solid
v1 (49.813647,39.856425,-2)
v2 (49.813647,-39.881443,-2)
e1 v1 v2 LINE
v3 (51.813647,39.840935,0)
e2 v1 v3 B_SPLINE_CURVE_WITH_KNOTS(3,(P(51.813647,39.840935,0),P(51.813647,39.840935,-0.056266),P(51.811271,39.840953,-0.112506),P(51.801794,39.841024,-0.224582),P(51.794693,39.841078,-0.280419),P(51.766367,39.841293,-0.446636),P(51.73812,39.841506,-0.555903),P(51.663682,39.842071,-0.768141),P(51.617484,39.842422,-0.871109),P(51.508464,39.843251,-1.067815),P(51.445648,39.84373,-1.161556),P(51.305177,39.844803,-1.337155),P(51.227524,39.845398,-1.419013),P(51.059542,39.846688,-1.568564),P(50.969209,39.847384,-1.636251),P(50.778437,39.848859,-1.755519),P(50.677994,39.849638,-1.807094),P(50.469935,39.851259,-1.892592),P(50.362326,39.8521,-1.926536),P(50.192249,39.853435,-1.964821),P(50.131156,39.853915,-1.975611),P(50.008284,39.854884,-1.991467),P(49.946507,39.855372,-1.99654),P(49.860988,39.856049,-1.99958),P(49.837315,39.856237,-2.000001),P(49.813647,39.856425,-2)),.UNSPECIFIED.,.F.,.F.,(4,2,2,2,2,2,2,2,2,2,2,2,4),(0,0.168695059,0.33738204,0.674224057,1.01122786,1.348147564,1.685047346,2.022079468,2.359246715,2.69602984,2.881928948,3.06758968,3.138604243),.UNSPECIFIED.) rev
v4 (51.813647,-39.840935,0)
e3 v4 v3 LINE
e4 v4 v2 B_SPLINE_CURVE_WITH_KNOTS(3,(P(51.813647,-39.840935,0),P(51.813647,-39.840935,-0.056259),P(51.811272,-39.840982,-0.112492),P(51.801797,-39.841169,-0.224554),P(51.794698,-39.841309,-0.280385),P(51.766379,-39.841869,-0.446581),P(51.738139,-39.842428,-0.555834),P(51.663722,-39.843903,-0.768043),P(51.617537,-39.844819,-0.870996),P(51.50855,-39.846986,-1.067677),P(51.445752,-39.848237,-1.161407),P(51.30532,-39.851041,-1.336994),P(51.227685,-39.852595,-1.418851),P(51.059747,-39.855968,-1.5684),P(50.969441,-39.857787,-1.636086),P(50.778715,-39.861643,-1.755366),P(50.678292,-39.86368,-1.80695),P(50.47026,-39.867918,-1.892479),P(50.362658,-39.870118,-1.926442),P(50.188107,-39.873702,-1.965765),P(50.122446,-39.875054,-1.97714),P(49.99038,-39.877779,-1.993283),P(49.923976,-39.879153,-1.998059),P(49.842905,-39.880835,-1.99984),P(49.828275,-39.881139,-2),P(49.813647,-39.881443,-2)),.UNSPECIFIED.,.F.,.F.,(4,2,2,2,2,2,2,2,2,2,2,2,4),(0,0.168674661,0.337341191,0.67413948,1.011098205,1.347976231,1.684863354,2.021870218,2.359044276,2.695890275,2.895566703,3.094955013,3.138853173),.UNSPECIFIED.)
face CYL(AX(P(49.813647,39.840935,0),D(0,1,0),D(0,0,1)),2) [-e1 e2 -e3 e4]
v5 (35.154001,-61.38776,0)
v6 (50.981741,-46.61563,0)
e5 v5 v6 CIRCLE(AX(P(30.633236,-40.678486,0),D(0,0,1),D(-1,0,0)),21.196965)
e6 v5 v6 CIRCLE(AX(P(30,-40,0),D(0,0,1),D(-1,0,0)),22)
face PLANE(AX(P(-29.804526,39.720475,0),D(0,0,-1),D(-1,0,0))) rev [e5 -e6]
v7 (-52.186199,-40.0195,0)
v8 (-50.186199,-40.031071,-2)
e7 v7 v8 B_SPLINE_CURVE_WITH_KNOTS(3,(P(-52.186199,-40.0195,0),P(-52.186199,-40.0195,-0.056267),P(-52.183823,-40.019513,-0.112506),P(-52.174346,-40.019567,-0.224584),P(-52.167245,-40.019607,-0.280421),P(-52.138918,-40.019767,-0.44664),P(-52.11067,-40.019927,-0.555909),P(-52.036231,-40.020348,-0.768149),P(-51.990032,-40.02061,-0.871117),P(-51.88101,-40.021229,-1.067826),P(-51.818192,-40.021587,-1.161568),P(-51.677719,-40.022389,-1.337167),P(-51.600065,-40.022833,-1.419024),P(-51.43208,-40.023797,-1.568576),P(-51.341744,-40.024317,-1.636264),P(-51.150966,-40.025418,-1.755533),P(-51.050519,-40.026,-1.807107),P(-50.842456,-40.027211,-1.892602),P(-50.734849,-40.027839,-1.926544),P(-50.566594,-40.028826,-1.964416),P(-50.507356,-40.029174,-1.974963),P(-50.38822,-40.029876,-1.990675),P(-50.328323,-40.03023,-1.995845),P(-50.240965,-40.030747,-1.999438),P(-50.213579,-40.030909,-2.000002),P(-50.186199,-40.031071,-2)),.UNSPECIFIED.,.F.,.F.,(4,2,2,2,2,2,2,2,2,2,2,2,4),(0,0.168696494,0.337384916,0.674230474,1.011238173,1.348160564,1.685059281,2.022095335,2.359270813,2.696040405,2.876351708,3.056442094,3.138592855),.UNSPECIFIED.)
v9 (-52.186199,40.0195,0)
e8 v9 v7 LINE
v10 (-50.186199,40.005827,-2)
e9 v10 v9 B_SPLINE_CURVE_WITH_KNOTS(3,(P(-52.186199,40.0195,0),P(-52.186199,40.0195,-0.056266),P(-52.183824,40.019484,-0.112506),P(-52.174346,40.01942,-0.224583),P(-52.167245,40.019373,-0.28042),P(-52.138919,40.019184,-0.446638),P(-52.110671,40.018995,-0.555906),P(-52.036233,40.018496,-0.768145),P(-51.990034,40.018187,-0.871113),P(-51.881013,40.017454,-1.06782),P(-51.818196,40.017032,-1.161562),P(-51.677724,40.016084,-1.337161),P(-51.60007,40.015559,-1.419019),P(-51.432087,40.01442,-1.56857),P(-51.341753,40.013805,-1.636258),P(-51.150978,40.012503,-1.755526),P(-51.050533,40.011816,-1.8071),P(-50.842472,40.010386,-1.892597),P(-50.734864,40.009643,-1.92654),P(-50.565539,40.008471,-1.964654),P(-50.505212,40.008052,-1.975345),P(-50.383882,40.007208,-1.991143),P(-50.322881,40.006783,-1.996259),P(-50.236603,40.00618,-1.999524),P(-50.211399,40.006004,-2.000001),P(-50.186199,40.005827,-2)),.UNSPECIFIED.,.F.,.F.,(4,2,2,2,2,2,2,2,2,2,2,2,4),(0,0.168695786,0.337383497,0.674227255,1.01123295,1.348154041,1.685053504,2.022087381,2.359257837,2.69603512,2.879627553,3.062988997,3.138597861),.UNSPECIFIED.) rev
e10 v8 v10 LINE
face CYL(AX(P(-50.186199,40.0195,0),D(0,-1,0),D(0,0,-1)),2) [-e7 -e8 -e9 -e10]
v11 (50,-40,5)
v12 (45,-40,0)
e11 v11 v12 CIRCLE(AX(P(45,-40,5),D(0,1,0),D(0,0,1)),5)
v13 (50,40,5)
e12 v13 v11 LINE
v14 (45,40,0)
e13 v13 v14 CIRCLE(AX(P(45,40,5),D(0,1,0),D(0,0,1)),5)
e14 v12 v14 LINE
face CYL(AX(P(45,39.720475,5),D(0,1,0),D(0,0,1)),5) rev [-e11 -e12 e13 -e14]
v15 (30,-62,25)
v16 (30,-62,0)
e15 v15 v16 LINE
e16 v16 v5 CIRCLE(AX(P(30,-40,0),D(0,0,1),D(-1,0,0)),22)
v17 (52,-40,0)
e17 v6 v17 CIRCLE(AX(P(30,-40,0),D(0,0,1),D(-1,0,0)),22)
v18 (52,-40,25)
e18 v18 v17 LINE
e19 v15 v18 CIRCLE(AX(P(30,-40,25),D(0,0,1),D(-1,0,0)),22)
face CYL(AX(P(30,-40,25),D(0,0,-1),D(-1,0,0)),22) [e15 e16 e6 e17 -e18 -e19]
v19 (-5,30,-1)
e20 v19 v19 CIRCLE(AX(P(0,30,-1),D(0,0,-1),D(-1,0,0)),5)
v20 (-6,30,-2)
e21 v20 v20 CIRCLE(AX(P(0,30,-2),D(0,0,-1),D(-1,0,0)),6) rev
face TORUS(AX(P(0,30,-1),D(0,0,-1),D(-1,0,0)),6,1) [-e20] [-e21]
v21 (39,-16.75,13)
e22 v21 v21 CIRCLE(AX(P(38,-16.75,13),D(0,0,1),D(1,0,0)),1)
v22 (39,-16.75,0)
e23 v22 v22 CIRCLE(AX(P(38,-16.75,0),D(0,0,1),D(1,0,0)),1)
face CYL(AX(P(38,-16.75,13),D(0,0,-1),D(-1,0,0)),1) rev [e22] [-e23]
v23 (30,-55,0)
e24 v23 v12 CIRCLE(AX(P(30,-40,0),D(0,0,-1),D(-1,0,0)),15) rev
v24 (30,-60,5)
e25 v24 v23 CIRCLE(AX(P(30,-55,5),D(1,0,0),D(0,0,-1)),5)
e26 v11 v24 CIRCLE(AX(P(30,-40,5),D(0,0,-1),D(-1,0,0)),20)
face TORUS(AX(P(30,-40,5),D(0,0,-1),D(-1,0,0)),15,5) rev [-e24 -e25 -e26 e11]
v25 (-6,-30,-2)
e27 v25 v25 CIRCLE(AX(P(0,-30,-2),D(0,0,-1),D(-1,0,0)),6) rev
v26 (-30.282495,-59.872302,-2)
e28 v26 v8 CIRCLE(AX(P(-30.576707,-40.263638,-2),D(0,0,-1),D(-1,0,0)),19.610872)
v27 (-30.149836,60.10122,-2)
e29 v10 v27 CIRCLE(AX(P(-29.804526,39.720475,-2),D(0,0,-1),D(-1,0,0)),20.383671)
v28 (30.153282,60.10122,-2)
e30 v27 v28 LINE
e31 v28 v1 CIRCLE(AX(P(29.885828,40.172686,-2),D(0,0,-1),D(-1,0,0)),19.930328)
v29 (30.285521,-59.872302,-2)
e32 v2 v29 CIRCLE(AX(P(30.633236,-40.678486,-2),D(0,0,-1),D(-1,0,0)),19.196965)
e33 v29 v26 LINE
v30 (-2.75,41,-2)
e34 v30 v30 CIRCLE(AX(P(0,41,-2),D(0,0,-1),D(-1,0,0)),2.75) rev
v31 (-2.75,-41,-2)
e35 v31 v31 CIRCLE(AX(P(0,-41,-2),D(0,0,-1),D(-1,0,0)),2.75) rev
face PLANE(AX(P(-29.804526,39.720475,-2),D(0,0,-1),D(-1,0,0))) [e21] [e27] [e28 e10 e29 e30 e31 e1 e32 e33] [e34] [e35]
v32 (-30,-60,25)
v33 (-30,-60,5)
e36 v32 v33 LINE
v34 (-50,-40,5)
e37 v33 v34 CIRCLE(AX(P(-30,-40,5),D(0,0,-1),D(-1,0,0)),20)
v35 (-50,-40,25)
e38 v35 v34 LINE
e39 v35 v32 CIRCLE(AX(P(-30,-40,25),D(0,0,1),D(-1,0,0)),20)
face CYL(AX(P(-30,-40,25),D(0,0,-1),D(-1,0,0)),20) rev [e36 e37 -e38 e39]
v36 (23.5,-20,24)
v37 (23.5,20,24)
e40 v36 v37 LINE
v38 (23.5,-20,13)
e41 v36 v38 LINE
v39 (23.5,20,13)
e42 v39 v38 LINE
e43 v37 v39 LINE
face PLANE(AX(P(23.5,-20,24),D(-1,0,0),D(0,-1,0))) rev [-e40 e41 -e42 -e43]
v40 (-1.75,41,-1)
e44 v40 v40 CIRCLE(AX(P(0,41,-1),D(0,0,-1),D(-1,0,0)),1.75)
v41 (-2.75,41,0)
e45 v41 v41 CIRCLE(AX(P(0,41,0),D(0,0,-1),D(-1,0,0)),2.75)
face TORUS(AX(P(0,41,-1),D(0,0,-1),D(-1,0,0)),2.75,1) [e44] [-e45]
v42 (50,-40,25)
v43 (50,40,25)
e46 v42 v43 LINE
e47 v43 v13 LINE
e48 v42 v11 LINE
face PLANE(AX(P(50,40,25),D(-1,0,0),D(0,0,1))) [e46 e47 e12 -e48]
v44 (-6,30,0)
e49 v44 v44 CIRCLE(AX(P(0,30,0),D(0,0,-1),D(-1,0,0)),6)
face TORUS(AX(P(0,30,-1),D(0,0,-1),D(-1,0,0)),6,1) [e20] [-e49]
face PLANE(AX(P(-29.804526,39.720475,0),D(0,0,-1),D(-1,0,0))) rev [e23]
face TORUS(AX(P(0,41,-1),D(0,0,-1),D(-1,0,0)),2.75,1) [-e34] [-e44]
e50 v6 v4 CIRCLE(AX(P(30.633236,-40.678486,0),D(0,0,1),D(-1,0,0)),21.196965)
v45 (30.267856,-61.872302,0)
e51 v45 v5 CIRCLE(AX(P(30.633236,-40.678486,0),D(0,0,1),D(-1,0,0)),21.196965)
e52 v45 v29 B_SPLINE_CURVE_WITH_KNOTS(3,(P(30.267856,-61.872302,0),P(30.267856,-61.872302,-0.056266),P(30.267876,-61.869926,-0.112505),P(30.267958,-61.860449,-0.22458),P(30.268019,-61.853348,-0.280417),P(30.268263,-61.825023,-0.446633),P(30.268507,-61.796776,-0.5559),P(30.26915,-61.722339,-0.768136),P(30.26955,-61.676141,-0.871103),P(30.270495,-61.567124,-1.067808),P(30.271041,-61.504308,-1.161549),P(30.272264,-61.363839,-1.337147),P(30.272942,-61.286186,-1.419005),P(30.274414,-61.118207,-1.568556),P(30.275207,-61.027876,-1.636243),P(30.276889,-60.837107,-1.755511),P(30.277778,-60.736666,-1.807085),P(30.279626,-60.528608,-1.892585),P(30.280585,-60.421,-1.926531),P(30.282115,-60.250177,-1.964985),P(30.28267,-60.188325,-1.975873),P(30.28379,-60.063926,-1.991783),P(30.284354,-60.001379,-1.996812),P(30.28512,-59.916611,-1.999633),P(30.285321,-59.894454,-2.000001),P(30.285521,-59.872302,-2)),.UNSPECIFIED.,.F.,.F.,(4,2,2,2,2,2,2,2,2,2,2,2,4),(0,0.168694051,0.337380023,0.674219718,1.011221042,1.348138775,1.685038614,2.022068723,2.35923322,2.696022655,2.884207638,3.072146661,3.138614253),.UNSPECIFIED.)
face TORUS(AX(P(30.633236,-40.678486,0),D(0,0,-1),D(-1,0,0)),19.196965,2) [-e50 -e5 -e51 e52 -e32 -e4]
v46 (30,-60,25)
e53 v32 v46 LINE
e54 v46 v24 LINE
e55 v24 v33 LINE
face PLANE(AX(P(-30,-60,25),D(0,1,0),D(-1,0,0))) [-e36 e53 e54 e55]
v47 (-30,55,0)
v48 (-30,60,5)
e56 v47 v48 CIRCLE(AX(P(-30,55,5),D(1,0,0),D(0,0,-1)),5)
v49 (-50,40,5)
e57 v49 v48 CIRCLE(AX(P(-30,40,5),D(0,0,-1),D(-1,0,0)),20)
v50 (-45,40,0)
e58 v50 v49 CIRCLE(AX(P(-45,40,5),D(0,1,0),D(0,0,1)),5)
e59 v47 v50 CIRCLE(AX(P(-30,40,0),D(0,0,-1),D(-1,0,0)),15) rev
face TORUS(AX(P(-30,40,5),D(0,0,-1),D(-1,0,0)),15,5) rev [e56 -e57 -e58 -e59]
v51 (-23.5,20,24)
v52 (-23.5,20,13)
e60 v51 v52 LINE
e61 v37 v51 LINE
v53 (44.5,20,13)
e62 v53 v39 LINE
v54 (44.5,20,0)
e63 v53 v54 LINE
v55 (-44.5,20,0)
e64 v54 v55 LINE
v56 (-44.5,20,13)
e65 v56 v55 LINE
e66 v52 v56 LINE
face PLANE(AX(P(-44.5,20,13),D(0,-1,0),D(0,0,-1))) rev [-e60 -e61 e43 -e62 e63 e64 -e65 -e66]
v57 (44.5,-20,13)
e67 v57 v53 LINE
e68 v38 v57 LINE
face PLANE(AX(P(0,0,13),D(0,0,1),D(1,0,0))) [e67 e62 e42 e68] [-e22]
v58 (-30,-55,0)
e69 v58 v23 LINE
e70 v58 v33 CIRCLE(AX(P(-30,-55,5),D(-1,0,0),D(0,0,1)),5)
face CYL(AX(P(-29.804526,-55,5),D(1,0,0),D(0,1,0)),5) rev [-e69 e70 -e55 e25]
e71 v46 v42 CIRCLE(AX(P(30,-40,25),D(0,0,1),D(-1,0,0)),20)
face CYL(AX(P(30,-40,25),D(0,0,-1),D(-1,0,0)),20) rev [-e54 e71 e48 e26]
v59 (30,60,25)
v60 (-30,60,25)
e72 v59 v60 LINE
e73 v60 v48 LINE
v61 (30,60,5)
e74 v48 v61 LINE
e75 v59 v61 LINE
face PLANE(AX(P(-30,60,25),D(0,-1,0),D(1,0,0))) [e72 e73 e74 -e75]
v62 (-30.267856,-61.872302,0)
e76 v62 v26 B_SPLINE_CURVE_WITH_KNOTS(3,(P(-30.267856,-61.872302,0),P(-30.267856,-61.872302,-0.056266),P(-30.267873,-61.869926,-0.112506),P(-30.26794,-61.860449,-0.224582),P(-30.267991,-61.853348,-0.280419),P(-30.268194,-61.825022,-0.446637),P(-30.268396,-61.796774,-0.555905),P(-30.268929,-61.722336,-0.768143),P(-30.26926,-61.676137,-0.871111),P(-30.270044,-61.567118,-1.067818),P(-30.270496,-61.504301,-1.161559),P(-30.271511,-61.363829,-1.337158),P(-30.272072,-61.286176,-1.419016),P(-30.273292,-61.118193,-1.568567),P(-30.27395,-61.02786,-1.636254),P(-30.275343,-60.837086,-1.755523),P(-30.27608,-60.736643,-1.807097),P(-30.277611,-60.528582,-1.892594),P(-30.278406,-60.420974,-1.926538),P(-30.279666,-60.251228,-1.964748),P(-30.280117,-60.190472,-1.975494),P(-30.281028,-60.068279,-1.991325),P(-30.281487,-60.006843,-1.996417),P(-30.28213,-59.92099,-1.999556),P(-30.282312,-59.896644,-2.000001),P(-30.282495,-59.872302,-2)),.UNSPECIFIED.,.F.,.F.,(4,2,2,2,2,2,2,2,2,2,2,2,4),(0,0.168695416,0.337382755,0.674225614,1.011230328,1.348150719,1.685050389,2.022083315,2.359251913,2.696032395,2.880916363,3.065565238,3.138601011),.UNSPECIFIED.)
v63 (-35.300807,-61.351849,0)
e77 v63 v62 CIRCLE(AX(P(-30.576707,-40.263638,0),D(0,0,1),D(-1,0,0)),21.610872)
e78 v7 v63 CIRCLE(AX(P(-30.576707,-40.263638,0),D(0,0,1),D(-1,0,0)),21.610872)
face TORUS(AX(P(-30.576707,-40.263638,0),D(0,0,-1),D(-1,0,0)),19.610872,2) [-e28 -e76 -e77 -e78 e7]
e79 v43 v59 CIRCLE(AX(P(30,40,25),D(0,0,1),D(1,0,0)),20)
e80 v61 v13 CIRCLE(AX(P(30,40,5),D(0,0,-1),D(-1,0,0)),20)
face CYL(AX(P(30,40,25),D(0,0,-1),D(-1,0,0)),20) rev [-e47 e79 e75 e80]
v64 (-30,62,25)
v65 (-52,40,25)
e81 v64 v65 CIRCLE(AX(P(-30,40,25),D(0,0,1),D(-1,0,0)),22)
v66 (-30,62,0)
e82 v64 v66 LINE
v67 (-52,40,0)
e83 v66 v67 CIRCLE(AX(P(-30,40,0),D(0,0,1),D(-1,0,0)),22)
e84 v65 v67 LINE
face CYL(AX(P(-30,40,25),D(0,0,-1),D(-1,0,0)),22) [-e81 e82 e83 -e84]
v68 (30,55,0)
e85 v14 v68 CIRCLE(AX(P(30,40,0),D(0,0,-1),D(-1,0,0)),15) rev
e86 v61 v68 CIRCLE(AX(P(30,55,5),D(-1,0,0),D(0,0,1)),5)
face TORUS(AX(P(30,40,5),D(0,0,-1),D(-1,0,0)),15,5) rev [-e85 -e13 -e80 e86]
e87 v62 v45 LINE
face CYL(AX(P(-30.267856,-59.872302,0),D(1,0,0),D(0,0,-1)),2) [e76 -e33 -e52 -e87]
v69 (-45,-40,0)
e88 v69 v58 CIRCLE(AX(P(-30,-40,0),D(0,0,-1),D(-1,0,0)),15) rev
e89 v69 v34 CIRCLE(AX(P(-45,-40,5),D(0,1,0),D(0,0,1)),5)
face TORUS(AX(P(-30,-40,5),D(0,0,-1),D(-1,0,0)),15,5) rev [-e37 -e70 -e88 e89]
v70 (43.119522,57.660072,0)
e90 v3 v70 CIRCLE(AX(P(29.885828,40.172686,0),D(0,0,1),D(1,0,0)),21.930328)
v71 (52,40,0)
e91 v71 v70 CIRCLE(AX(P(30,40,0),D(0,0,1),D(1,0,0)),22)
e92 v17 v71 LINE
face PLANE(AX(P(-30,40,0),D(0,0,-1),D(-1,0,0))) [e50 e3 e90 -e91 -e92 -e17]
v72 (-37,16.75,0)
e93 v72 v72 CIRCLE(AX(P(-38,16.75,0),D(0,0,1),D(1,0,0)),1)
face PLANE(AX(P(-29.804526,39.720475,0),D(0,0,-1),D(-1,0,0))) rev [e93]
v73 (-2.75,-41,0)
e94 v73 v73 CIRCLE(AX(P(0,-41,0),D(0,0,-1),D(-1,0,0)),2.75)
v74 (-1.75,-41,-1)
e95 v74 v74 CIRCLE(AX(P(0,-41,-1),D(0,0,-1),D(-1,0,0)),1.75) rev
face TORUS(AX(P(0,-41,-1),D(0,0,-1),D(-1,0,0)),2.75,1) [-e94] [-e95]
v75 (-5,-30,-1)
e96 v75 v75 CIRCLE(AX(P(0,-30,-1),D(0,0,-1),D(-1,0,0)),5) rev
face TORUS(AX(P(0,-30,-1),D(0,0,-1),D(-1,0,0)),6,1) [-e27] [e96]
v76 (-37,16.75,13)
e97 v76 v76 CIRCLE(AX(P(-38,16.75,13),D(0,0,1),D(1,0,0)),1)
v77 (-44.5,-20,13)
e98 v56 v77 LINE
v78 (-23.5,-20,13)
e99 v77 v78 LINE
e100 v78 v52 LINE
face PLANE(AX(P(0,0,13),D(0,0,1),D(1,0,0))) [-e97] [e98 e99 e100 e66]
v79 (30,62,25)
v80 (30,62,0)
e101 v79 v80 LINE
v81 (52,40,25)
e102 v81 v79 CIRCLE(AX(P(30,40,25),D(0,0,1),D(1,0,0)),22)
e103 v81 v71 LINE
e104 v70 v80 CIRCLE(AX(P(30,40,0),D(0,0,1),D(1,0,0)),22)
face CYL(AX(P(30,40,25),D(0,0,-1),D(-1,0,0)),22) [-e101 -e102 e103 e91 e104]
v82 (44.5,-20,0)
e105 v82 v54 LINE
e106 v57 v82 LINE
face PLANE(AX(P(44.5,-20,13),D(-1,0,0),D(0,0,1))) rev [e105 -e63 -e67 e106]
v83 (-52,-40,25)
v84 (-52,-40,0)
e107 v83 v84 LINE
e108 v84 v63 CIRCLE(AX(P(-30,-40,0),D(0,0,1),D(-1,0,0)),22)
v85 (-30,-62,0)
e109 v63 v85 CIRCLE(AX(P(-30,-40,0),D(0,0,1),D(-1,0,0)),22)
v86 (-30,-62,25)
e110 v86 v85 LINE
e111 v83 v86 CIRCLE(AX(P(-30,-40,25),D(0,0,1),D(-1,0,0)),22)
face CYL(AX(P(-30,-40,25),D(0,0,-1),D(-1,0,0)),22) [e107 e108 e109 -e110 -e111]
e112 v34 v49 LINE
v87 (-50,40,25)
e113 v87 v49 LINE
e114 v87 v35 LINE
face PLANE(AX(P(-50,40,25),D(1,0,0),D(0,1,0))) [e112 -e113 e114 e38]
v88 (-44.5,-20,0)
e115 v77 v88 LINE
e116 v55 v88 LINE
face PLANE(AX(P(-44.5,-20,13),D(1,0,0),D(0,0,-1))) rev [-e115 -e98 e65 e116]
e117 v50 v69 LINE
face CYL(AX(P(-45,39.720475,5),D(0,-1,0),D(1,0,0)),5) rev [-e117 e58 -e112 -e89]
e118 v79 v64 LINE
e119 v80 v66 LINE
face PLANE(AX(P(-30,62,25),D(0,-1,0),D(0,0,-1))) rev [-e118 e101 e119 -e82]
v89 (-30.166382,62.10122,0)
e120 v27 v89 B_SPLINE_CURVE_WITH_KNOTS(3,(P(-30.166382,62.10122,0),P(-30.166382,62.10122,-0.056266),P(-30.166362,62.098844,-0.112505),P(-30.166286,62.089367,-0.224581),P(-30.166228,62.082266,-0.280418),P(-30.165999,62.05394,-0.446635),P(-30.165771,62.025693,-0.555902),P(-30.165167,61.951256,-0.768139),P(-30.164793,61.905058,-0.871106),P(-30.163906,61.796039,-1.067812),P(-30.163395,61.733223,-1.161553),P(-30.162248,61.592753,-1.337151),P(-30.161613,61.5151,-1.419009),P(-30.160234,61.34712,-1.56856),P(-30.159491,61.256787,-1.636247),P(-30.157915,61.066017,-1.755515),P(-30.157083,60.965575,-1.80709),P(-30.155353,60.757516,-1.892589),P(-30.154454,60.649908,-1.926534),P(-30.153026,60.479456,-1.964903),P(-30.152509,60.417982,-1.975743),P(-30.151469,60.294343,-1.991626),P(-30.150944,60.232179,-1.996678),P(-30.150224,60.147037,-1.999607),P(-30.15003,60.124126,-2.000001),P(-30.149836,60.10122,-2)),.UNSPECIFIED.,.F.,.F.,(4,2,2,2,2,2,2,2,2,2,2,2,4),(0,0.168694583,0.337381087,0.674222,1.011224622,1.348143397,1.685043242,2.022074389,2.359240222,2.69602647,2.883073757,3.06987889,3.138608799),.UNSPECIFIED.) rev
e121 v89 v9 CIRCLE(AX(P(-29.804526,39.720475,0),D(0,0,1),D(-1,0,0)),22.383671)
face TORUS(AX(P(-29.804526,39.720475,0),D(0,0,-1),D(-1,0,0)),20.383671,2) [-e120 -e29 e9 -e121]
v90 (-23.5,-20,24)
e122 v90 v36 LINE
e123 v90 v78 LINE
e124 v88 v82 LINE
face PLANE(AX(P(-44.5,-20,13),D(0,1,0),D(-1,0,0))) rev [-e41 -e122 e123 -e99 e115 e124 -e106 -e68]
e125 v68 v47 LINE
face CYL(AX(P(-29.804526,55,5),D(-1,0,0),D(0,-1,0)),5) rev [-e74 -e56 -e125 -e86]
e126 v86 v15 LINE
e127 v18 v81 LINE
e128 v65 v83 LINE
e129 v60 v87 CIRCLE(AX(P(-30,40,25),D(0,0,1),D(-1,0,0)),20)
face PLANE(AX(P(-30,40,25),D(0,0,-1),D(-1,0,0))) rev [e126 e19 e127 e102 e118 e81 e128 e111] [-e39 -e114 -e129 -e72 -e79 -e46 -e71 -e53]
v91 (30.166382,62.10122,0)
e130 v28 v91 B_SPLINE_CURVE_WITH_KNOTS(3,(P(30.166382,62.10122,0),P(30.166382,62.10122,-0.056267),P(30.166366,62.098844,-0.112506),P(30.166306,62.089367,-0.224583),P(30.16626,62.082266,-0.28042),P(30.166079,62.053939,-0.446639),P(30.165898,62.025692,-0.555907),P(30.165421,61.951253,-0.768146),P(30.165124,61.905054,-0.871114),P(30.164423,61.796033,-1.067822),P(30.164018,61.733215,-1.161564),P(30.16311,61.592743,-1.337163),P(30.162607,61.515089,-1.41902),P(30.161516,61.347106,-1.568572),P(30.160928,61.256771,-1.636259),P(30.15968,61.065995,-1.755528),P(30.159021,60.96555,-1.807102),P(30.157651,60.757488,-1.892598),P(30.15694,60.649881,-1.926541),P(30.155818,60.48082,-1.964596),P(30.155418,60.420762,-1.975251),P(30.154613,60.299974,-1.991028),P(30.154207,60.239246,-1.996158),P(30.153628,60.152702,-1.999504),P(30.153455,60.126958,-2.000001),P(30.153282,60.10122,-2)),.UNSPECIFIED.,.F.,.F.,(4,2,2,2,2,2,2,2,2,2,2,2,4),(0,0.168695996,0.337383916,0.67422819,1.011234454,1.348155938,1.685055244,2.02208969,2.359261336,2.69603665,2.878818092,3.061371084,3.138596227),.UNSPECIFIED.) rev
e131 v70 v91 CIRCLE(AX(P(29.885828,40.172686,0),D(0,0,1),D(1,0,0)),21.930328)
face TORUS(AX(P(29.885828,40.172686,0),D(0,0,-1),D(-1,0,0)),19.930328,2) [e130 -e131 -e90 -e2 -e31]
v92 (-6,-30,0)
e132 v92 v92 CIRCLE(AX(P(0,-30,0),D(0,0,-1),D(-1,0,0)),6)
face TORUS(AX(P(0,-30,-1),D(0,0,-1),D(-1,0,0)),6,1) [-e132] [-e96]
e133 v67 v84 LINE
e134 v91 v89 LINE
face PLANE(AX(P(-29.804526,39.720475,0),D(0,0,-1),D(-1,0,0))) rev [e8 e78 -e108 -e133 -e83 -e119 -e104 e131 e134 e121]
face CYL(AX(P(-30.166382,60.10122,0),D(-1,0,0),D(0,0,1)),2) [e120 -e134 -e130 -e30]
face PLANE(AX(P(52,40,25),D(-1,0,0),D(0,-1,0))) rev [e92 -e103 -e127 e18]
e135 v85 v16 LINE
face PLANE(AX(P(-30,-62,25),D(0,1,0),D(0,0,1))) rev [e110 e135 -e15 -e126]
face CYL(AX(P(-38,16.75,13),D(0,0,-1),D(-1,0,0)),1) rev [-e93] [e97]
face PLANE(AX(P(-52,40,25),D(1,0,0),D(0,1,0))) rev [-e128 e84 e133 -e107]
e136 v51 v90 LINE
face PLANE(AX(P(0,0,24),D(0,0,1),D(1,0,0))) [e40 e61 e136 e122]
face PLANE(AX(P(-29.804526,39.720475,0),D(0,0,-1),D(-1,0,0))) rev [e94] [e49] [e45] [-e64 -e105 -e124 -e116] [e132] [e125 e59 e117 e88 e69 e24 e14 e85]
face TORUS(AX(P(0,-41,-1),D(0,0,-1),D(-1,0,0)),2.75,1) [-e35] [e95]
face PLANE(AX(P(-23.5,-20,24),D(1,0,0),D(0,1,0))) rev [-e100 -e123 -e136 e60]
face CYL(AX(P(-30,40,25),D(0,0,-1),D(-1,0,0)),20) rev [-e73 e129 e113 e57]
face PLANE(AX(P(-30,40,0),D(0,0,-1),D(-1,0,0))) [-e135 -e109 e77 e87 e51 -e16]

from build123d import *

# Parameters (mm, degrees)
BOSS_EXTRUDE7_DEPTH  = 25
CASE_BOTTOM_R        = 1.75
CASE_BOTTOM_R_2      = 5
BOSS_EXTRUDE9_DEPTH  = 2
FILLET1_R            = 5
FILLET2_R            = 2
FILLET3_R            = 1
SONOFF_W             = 89
SONOFF_H             = 40
SONOFF_R             = 1
BOSS_EXTRUDE10_DEPTH = 13
SKETCH2_W            = 47
SKETCH2_H            = 40
BOSS_EXTRUDE11_DEPTH = 24


# Some blends are built 0.0001 mm under size
with BuildPart() as part:
    # Case Sides → Boss-Extrude7 (new body)
    with BuildSketch(Plane.XY):
        with BuildLine():
            Line((-30, 62), (30, 62))
            ThreePointArc((30, 62), (45.556349186, 55.556349186), (52, 40))
            Line((52, 40), (52, -40))
            ThreePointArc((52, -40), (45.556349186, -55.556349186), (30, -62))
            Line((30, -62), (-30, -62))
            ThreePointArc((-30, -62), (-45.556349186, -55.556349186), (-52, -40))
            Line((-52, -40), (-52, 40))
            ThreePointArc((-52, 40), (-45.556349186, 55.556349186), (-30, 62))
        make_face()
        with BuildLine():
            Line((-30, 60), (30, 60))
            ThreePointArc((30, 60), (44.142135624, 54.142135624), (50, 40))
            Line((50, 40), (50, -40))
            ThreePointArc((50, -40), (44.142135624, -54.142135624), (30, -60))
            Line((30, -60), (-30, -60))
            ThreePointArc((-30, -60), (-44.142135624, -54.142135624), (-50, -40))
            Line((-50, -40), (-50, 40))
            ThreePointArc((-50, 40), (-44.142135624, 54.142135624), (-30, 60))
        make_face(mode=Mode.SUBTRACT)
    extrude(amount=BOSS_EXTRUDE7_DEPTH)

    # Case Bottom → Boss-Extrude9 (add)
    with BuildSketch(Plane.XY):
        with BuildLine():
            Line((-30.166381545, 62.101220113), (30.166381545, 62.101220113))
            ThreePointArc((30.166381545, 62.101220113), (45.607883681, 55.461776572), (51.813647258, 39.840934815))
            Line((51.813647258, 39.840934815), (51.813647258, -39.840934815))
            ThreePointArc((51.813647258, -39.840934815), (45.787828122, -55.499068587), (30.267855704, -61.872302115))
            Line((30.267855704, -61.872302115), (-30.267855704, -61.872302115))
            ThreePointArc((-30.267855704, -61.872302115), (-45.835002173, -55.567695757), (-52.186199447, -40.019499601))
            Line((-52.186199447, -40.019499601), (-52.186199447, 40.019499601))
            ThreePointArc((-52.186199447, 40.019499601), (-45.654372223, 55.52588799), (-30.166381545, 62.101220113))
        make_face()
        with Locations((0, 41)):
            Circle(CASE_BOTTOM_R, mode=Mode.SUBTRACT)
        with Locations((0, -41)):
            Circle(CASE_BOTTOM_R, mode=Mode.SUBTRACT)
        with Locations((0, 30)):
            Circle(CASE_BOTTOM_R_2, mode=Mode.SUBTRACT)
        with Locations((0, -30)):
            Circle(CASE_BOTTOM_R_2, mode=Mode.SUBTRACT)
    extrude(amount=-BOSS_EXTRUDE9_DEPTH)

    # Fillet1
    fillet1_edges = [part.edges().sort_by_distance(p)[0] for p in [
        (44.142135624, 54.142135624, 0),
        (0, 60, 0),
        (-44.142135624, 54.142135624, 0),
        (-50, 0, 0),
        (-44.142135624, -54.142135624, 0),
        (0, -60, 0),
        (44.142135624, -54.142135624, 0),
        (50, 0, 0),
    ]]
    fillet(fillet1_edges, radius=FILLET1_R)

    # Fillet2
    # the kernel refuses this fillet: 2 mm, written as the material it adds along each edge
    with BuildSketch(Plane(origin=(51.813647258, 39.840934815, 0.036995851), x_dir=(0.014804575706989804, 0.9998904062636744, 0), z_dir=(0, 0, -1))) as fillet2_piece_1:
        with BuildLine():
            CenterArc((0.014812433, 1.999999896), FILLET2_R, 269.151729306, 0.829764856)
            Line((-0.014796719, 0.000219083), (0, 0))
            ThreePointArc((0, 0), (0.007083229, 1.144e-06), (0.014166457, 0))
        make_face()
    extrude(amount=2.036995851)
    with BuildSketch(Plane(origin=(51.813647258, -39.840934815, 0.096592655), x_dir=(0, 1, 0), z_dir=(0, 0, -1))) as fillet2_piece_2:
        with BuildLine():
            CenterArc((0.038637062, 2), FILLET2_R, 267.835326297, 2.164673703)
            ThreePointArc((-0.03690633, 0.00142721), (-0.018452854, 0.000721643), (0, 0))
            Line((0, 0), (0.038637062, 0))
        make_face()
    extrude(amount=2.096592655)
    with BuildSketch(Plane(origin=(30.267855704, -61.872302115, 0.042125301), x_dir=(0.9998579024887219, -0.016857485899548712, 0), z_dir=(0, 0, -1))) as fillet2_piece_3:
        with BuildLine():
            CenterArc((0.016867246, 1.999999856), FILLET2_R, 269.034091453, 0.944139309)
            Line((-0.016847726, 0.000284051), (0, 0))
            ThreePointArc((0, 0), (0.008053678, 1.53e-06), (0.016107356, 0))
        make_face()
    extrude(amount=2.042125301)
    with BuildSketch(Plane(origin=(-30.267855704, -61.872302115, 0.034939961), x_dir=(-0.9999022450245147, -0.013982145576956704, 0), z_dir=(0, 0, -1))) as fillet2_piece_4:
        with BuildLine():
            CenterArc((0.013989673, -1.999999904), FILLET2_R, 90.017724864, 0.783419172)
            Line((-0.013974618, -0.000195414), (0, 0))
            ThreePointArc((0, 0), (0.006685479, -1.034e-06), (0.013370958, 0))
        make_face()
    extrude(amount=2.034939961)
    with BuildSketch(Plane(origin=(-52.186199447, -40.019499601, 0), x_dir=(0, 1, 0), z_dir=(0, 0, -1))) as fillet2_piece_5:
        with BuildLine():
            CenterArc((0.011047407, -2), FILLET2_R, 90, 0.619262575)
            ThreePointArc((-0.010568514, -0.000116815), (-0.00528425, -5.9054e-05), (0, 0))
            Line((0, 0), (0.011047407, 0))
        make_face()
    extrude(amount=2)
    # the kernel refuses this fillet: 2 mm, written as the material it takes off along each edge
    with BuildSketch(Plane(origin=(-52.186199447, 40.019499601, 0.035818212), x_dir=(0, -1, 0), z_dir=(0, 0, -1))) as fillet2_2_piece_1:
        with BuildLine():
            CenterArc((0.013672232, -2), FILLET2_R, 90, 0.802114876)
            ThreePointArc((-0.014325944, -0.000195984), (-0.007162988, -9.6846e-05), (0, 0))
            Line((0, 0), (0.013672232, 0))
        make_face()
    extrude(amount=2.071636423, mode=Mode.SUBTRACT)
    with BuildSketch(Plane(origin=(-30.166381545, 62.101220113, 0.043345147), x_dir=(1, 0, 0), z_dir=(0, 0, -1))) as fillet2_2_piece_2:
        with BuildLine():
            CenterArc((0.016545352, 2), FILLET2_R, 269.029333404, 0.970666596)
            ThreePointArc((-0.017335683, 0.000287002), (-0.008667869, 0.000141822), (0, 0))
            Line((0, 0), (0.016545352, 0))
        make_face()
    extrude(amount=2.086690294, mode=Mode.SUBTRACT)
    with BuildSketch(Plane(origin=(30.166381545, 62.101220113, 0.034352007), x_dir=(0.9999141102581969, -0.013106185812745422, 0), z_dir=(0, 0, -1))) as fillet2_2_piece_3:
        with BuildLine():
            CenterArc((0.013114237, 1.999999902), FILLET2_R, 269.249049368, 0.768900433)
            Line((-0.013098135, 0.000171681), (0, 0))
            ThreePointArc((0, 0), (0.006870401, -1.076e-06), (0.013740803, 0))
        make_face()
    extrude(amount=2.068704014, mode=Mode.SUBTRACT)
    # the kernel refuses this fillet: 2 mm, written as the material it takes off along each edge
    with BuildSketch(Plane(origin=(-29.804526261, 39.720474564, -2), x_dir=(-0.9999020079624725, 0.013999088278010021, 0), z_dir=(-0.013999088278010021, -0.9999020079624725, 0))) as fillet2_3_piece_1:
        with BuildLine():
            CenterArc((22.383670624 - FILLET2_R, -FILLET2_R), FILLET2_R, 0, 90)
            Line((22.383670624, -FILLET2_R), (22.383670624, 0))
            Line((22.383670624, 0), (22.383670624 - FILLET2_R, 0))
        make_face()
    revolve(axis=Axis((-29.804526261, 39.720474564, -2), (0, 0, -1)), revolution_arc=88.227218528, mode=Mode.SUBTRACT)
    with BuildSketch(Plane(origin=(-30.149836193, 62.101220113, -2), x_dir=(0, -1, 0), z_dir=(1, 0, 0))) as fillet2_3_piece_2:
        with BuildLine():
            CenterArc((FILLET2_R, -FILLET2_R), FILLET2_R, 90, 90)
            Line((0, -FILLET2_R), (0, 0))
            Line((0, 0), (FILLET2_R, 0))
        make_face()
    extrude(amount=60.303118478, mode=Mode.SUBTRACT)
    with BuildSketch(Plane(origin=(29.885828413, 40.172686456, -2), x_dir=(0.013419441370281596, 0.9999099552426256, 0), z_dir=(-0.9999099552426256, 0.013419441370281596, 0))) as fillet2_3_piece_3:
        with BuildLine():
            CenterArc((21.930328279 - FILLET2_R, -FILLET2_R), FILLET2_R, 0, 90)
            Line((21.930328279, -FILLET2_R), (21.930328279, 0))
            Line((21.930328279, 0), (21.930328279 - FILLET2_R, 0))
        make_face()
    revolve(axis=Axis((29.885828413, 40.172686456, -2), (0, 0, -1)), revolution_arc=90.060864423, mode=Mode.SUBTRACT)
    with BuildSketch(Plane(origin=(51.813647258, 39.826136474, -2), x_dir=(-1, 0, 0), z_dir=(0, -1, 0))) as fillet2_3_piece_4:
        with BuildLine():
            CenterArc((FILLET2_R, -FILLET2_R), FILLET2_R, 90, 90)
            Line((0, -FILLET2_R), (0, 0))
            Line((0, 0), (FILLET2_R, 0))
        make_face()
    extrude(amount=79.628434227, mode=Mode.SUBTRACT)
    with BuildSketch(Plane(origin=(30.63323575, -40.678486464, -2), x_dir=(0.999286394870838, 0.03777169609699212, 0), z_dir=(-0.03777169609699212, 0.999286394870838, 0))) as fillet2_3_piece_5:
        with BuildLine():
            CenterArc((21.196964981 - FILLET2_R, -FILLET2_R), FILLET2_R, 0, 90)
            Line((21.196964981, -FILLET2_R), (21.196964981, 0))
            Line((21.196964981, 0), (21.196964981 - FILLET2_R, 0))
        make_face()
    revolve(axis=Axis((30.63323575, -40.678486464, -2), (0, 0, -1)), revolution_arc=93.108813012, mode=Mode.SUBTRACT)
    with BuildSketch(Plane(origin=(30.251005584, -61.872302115, -2), x_dir=(0, 1, 0), z_dir=(-1, 0, 0))) as fillet2_3_piece_6:
        with BuildLine():
            CenterArc((FILLET2_R, -FILLET2_R), FILLET2_R, 90, 90)
            Line((0, -FILLET2_R), (0, 0))
            Line((0, 0), (FILLET2_R, 0))
        make_face()
    extrude(amount=60.504885303, mode=Mode.SUBTRACT)
    with BuildSketch(Plane(origin=(-30.576706868, -40.263637561, -2), x_dir=(0.013672817925882458, -0.9999065226559758, 0), z_dir=(0.9999065226559758, 0.013672817925882458, 0))) as fillet2_3_piece_7:
        with BuildLine():
            CenterArc((21.610871636 - FILLET2_R, -FILLET2_R), FILLET2_R, 0, 90)
            Line((21.610871636, -FILLET2_R), (21.610871636, 0))
            Line((21.610871636, 0), (21.610871636 - FILLET2_R, 0))
        make_face()
    revolve(axis=Axis((-30.576706868, -40.263637561, -2), (0, 0, -1)), revolution_arc=91.402681747, mode=Mode.SUBTRACT)
    with BuildSketch(Plane(origin=(-52.186199447, -40.008452194, -2), x_dir=(1, 0, 0), z_dir=(0, 1, 0))) as fillet2_3_piece_8:
        with BuildLine():
            CenterArc((FILLET2_R, -FILLET2_R), FILLET2_R, 90, 90)
            Line((0, -FILLET2_R), (0, 0))
            Line((0, 0), (FILLET2_R, 0))
        make_face()
    extrude(amount=80.014279563, mode=Mode.SUBTRACT)
    with BuildSketch(Plane(origin=(-54.186199447, -40.008452194, -2), x_dir=(1, 0, 0), z_dir=(0, 1, 0))) as fillet2_3_piece_9:
        with BuildLine():
            CenterArc((2 + FILLET2_R, -FILLET2_R), FILLET2_R, 90, 90)
            Line((2, -FILLET2_R), (2, 0))
            Line((2, 0), (2 + FILLET2_R, 0))
        make_face()
    revolve(axis=Axis((-54.186199447, -40.008452194, -2), (0, 0, -1)), revolution_arc=0.619262575, mode=Mode.SUBTRACT)
    with BuildSketch(Plane(origin=(-50.186199447, 40.005827368, -2), x_dir=(-0.9999020079624727, 0.013999088277994795, 0), z_dir=(0.013999088277994795, 0.9999020079624727, 0))) as fillet2_3_piece_10:
        with BuildLine():
            CenterArc((2 - FILLET2_R, FILLET2_R), FILLET2_R, 270, 90)
            Line((2, FILLET2_R), (2, 0))
            Line((2, 0), (2 - FILLET2_R, 0))
        make_face()
    revolve(axis=Axis((-50.186199447, 40.005827368, -2), (0, 0, 1)), revolution_arc=0.802114876, mode=Mode.SUBTRACT)
    with BuildSketch(Plane(origin=(-30.253879719, -63.872302115, -2), x_dir=(-0.013672817925883145, 0.999906522655976, 0), z_dir=(-0.999906522655976, -0.013672817925883145, 0))) as fillet2_3_piece_11:
        with BuildLine():
            CenterArc((2 + FILLET2_R, -FILLET2_R), FILLET2_R, 90, 90)
            Line((2, -FILLET2_R), (2, 0))
            Line((2, 0), (2 + FILLET2_R, 0))
        make_face()
    revolve(axis=Axis((-30.253879719, -63.872302115, -2), (0, 0, -1)), revolution_arc=0.783419172, mode=Mode.SUBTRACT)
    with BuildSketch(Plane(origin=(30.251005584, -63.872302115, -2), x_dir=(0.016477593803021027, 0.9998642352351956, 0), z_dir=(0.9998642352351956, -0.016477593803021027, 0))) as fillet2_3_piece_12:
        with BuildLine():
            CenterArc((2 + FILLET2_R, FILLET2_R), FILLET2_R, 180, 90)
            Line((2, FILLET2_R), (2, 0))
            Line((2, 0), (2 + FILLET2_R, 0))
        make_face()
    revolve(axis=Axis((30.251005584, -63.872302115, -2), (0, 0, 1)), revolution_arc=0.944139309, mode=Mode.SUBTRACT)
    with BuildSketch(Plane(origin=(53.813647258, -39.802297753, -2), x_dir=(-1, 0, 0), z_dir=(0, 1, 0))) as fillet2_3_piece_13:
        with BuildLine():
            CenterArc((2 + FILLET2_R, FILLET2_R), FILLET2_R, 180, 90)
            Line((2, FILLET2_R), (2, 0))
            Line((2, 0), (2 + FILLET2_R, 0))
        make_face()
    revolve(axis=Axis((53.813647258, -39.802297753, -2), (0, 0, 1)), revolution_arc=2.164673703, mode=Mode.SUBTRACT)
    with BuildSketch(Plane(origin=(53.813647258, 39.826136474, -2), x_dir=(-0.9998951358062248, 0.014481622528268918, 0), z_dir=(0.014481622528268918, 0.9998951358062248, 0))) as fillet2_3_piece_14:
        with BuildLine():
            CenterArc((2 + FILLET2_R, FILLET2_R), FILLET2_R, 180, 90)
            Line((2, FILLET2_R), (2, 0))
            Line((2, 0), (2 + FILLET2_R, 0))
        make_face()
    revolve(axis=Axis((53.813647258, 39.826136474, -2), (0, 0, 1)), revolution_arc=0.829764856, mode=Mode.SUBTRACT)
    with BuildSketch(Plane(origin=(30.153282285, 60.101220113, -2), x_dir=(0.013419441370290391, 0.9999099552426255, 0), z_dir=(0.9999099552426255, -0.013419441370290391, 0))) as fillet2_3_piece_15:
        with BuildLine():
            CenterArc((2 - FILLET2_R, FILLET2_R), FILLET2_R, 270, 90)
            Line((2, FILLET2_R), (2, 0))
            Line((2, 0), (2 - FILLET2_R, 0))
        make_face()
    revolve(axis=Axis((30.153282285, 60.101220113, -2), (0, 0, 1)), revolution_arc=0.768900433, mode=Mode.SUBTRACT)
    with BuildSketch(Plane(origin=(-30.149836193, 60.101220113, -2), x_dir=(0, 1, 0), z_dir=(1, 0, 0))) as fillet2_3_piece_16:
        with BuildLine():
            CenterArc((2 - FILLET2_R, FILLET2_R), FILLET2_R, 270, 90)
            Line((2, FILLET2_R), (2, 0))
            Line((2, 0), (2 - FILLET2_R, 0))
        make_face()
    revolve(axis=Axis((-30.149836193, 60.101220113, -2), (0, 0, 1)), revolution_arc=0.970666596, mode=Mode.SUBTRACT)

    # Fillet3
    fillet3_edges = [part.edges().sort_by_distance(p)[0] for p in [
        (-5, -30, -2),
        (-5, 30, -2),
        (-1.75, -41, -2),
        (-1.75, 41, -2),
        (-1.75, 41, 0),
        (-1.75, -41, 0),
        (-5, 30, 0),
        (-5, -30, 0),
    ]]
    fillet(fillet3_edges, radius=FILLET3_R - 0.0001)  # a hair under: the kernel refuses the full size

    # Sonoff → Boss-Extrude10 (add)
    with BuildSketch(Plane.XY):
        Rectangle(SONOFF_W, SONOFF_H)
        with Locations((-38, 16.75)):
            Circle(SONOFF_R, mode=Mode.SUBTRACT)
        with Locations((38, -16.75)):
            Circle(SONOFF_R, mode=Mode.SUBTRACT)
    extrude(amount=BOSS_EXTRUDE10_DEPTH)

    # Sketch2 → Boss-Extrude11 (add)
    with BuildSketch(Plane.XY):
        Rectangle(SKETCH2_W, SKETCH2_H)
    extrude(amount=BOSS_EXTRUDE11_DEPTH)


solid = part.part
